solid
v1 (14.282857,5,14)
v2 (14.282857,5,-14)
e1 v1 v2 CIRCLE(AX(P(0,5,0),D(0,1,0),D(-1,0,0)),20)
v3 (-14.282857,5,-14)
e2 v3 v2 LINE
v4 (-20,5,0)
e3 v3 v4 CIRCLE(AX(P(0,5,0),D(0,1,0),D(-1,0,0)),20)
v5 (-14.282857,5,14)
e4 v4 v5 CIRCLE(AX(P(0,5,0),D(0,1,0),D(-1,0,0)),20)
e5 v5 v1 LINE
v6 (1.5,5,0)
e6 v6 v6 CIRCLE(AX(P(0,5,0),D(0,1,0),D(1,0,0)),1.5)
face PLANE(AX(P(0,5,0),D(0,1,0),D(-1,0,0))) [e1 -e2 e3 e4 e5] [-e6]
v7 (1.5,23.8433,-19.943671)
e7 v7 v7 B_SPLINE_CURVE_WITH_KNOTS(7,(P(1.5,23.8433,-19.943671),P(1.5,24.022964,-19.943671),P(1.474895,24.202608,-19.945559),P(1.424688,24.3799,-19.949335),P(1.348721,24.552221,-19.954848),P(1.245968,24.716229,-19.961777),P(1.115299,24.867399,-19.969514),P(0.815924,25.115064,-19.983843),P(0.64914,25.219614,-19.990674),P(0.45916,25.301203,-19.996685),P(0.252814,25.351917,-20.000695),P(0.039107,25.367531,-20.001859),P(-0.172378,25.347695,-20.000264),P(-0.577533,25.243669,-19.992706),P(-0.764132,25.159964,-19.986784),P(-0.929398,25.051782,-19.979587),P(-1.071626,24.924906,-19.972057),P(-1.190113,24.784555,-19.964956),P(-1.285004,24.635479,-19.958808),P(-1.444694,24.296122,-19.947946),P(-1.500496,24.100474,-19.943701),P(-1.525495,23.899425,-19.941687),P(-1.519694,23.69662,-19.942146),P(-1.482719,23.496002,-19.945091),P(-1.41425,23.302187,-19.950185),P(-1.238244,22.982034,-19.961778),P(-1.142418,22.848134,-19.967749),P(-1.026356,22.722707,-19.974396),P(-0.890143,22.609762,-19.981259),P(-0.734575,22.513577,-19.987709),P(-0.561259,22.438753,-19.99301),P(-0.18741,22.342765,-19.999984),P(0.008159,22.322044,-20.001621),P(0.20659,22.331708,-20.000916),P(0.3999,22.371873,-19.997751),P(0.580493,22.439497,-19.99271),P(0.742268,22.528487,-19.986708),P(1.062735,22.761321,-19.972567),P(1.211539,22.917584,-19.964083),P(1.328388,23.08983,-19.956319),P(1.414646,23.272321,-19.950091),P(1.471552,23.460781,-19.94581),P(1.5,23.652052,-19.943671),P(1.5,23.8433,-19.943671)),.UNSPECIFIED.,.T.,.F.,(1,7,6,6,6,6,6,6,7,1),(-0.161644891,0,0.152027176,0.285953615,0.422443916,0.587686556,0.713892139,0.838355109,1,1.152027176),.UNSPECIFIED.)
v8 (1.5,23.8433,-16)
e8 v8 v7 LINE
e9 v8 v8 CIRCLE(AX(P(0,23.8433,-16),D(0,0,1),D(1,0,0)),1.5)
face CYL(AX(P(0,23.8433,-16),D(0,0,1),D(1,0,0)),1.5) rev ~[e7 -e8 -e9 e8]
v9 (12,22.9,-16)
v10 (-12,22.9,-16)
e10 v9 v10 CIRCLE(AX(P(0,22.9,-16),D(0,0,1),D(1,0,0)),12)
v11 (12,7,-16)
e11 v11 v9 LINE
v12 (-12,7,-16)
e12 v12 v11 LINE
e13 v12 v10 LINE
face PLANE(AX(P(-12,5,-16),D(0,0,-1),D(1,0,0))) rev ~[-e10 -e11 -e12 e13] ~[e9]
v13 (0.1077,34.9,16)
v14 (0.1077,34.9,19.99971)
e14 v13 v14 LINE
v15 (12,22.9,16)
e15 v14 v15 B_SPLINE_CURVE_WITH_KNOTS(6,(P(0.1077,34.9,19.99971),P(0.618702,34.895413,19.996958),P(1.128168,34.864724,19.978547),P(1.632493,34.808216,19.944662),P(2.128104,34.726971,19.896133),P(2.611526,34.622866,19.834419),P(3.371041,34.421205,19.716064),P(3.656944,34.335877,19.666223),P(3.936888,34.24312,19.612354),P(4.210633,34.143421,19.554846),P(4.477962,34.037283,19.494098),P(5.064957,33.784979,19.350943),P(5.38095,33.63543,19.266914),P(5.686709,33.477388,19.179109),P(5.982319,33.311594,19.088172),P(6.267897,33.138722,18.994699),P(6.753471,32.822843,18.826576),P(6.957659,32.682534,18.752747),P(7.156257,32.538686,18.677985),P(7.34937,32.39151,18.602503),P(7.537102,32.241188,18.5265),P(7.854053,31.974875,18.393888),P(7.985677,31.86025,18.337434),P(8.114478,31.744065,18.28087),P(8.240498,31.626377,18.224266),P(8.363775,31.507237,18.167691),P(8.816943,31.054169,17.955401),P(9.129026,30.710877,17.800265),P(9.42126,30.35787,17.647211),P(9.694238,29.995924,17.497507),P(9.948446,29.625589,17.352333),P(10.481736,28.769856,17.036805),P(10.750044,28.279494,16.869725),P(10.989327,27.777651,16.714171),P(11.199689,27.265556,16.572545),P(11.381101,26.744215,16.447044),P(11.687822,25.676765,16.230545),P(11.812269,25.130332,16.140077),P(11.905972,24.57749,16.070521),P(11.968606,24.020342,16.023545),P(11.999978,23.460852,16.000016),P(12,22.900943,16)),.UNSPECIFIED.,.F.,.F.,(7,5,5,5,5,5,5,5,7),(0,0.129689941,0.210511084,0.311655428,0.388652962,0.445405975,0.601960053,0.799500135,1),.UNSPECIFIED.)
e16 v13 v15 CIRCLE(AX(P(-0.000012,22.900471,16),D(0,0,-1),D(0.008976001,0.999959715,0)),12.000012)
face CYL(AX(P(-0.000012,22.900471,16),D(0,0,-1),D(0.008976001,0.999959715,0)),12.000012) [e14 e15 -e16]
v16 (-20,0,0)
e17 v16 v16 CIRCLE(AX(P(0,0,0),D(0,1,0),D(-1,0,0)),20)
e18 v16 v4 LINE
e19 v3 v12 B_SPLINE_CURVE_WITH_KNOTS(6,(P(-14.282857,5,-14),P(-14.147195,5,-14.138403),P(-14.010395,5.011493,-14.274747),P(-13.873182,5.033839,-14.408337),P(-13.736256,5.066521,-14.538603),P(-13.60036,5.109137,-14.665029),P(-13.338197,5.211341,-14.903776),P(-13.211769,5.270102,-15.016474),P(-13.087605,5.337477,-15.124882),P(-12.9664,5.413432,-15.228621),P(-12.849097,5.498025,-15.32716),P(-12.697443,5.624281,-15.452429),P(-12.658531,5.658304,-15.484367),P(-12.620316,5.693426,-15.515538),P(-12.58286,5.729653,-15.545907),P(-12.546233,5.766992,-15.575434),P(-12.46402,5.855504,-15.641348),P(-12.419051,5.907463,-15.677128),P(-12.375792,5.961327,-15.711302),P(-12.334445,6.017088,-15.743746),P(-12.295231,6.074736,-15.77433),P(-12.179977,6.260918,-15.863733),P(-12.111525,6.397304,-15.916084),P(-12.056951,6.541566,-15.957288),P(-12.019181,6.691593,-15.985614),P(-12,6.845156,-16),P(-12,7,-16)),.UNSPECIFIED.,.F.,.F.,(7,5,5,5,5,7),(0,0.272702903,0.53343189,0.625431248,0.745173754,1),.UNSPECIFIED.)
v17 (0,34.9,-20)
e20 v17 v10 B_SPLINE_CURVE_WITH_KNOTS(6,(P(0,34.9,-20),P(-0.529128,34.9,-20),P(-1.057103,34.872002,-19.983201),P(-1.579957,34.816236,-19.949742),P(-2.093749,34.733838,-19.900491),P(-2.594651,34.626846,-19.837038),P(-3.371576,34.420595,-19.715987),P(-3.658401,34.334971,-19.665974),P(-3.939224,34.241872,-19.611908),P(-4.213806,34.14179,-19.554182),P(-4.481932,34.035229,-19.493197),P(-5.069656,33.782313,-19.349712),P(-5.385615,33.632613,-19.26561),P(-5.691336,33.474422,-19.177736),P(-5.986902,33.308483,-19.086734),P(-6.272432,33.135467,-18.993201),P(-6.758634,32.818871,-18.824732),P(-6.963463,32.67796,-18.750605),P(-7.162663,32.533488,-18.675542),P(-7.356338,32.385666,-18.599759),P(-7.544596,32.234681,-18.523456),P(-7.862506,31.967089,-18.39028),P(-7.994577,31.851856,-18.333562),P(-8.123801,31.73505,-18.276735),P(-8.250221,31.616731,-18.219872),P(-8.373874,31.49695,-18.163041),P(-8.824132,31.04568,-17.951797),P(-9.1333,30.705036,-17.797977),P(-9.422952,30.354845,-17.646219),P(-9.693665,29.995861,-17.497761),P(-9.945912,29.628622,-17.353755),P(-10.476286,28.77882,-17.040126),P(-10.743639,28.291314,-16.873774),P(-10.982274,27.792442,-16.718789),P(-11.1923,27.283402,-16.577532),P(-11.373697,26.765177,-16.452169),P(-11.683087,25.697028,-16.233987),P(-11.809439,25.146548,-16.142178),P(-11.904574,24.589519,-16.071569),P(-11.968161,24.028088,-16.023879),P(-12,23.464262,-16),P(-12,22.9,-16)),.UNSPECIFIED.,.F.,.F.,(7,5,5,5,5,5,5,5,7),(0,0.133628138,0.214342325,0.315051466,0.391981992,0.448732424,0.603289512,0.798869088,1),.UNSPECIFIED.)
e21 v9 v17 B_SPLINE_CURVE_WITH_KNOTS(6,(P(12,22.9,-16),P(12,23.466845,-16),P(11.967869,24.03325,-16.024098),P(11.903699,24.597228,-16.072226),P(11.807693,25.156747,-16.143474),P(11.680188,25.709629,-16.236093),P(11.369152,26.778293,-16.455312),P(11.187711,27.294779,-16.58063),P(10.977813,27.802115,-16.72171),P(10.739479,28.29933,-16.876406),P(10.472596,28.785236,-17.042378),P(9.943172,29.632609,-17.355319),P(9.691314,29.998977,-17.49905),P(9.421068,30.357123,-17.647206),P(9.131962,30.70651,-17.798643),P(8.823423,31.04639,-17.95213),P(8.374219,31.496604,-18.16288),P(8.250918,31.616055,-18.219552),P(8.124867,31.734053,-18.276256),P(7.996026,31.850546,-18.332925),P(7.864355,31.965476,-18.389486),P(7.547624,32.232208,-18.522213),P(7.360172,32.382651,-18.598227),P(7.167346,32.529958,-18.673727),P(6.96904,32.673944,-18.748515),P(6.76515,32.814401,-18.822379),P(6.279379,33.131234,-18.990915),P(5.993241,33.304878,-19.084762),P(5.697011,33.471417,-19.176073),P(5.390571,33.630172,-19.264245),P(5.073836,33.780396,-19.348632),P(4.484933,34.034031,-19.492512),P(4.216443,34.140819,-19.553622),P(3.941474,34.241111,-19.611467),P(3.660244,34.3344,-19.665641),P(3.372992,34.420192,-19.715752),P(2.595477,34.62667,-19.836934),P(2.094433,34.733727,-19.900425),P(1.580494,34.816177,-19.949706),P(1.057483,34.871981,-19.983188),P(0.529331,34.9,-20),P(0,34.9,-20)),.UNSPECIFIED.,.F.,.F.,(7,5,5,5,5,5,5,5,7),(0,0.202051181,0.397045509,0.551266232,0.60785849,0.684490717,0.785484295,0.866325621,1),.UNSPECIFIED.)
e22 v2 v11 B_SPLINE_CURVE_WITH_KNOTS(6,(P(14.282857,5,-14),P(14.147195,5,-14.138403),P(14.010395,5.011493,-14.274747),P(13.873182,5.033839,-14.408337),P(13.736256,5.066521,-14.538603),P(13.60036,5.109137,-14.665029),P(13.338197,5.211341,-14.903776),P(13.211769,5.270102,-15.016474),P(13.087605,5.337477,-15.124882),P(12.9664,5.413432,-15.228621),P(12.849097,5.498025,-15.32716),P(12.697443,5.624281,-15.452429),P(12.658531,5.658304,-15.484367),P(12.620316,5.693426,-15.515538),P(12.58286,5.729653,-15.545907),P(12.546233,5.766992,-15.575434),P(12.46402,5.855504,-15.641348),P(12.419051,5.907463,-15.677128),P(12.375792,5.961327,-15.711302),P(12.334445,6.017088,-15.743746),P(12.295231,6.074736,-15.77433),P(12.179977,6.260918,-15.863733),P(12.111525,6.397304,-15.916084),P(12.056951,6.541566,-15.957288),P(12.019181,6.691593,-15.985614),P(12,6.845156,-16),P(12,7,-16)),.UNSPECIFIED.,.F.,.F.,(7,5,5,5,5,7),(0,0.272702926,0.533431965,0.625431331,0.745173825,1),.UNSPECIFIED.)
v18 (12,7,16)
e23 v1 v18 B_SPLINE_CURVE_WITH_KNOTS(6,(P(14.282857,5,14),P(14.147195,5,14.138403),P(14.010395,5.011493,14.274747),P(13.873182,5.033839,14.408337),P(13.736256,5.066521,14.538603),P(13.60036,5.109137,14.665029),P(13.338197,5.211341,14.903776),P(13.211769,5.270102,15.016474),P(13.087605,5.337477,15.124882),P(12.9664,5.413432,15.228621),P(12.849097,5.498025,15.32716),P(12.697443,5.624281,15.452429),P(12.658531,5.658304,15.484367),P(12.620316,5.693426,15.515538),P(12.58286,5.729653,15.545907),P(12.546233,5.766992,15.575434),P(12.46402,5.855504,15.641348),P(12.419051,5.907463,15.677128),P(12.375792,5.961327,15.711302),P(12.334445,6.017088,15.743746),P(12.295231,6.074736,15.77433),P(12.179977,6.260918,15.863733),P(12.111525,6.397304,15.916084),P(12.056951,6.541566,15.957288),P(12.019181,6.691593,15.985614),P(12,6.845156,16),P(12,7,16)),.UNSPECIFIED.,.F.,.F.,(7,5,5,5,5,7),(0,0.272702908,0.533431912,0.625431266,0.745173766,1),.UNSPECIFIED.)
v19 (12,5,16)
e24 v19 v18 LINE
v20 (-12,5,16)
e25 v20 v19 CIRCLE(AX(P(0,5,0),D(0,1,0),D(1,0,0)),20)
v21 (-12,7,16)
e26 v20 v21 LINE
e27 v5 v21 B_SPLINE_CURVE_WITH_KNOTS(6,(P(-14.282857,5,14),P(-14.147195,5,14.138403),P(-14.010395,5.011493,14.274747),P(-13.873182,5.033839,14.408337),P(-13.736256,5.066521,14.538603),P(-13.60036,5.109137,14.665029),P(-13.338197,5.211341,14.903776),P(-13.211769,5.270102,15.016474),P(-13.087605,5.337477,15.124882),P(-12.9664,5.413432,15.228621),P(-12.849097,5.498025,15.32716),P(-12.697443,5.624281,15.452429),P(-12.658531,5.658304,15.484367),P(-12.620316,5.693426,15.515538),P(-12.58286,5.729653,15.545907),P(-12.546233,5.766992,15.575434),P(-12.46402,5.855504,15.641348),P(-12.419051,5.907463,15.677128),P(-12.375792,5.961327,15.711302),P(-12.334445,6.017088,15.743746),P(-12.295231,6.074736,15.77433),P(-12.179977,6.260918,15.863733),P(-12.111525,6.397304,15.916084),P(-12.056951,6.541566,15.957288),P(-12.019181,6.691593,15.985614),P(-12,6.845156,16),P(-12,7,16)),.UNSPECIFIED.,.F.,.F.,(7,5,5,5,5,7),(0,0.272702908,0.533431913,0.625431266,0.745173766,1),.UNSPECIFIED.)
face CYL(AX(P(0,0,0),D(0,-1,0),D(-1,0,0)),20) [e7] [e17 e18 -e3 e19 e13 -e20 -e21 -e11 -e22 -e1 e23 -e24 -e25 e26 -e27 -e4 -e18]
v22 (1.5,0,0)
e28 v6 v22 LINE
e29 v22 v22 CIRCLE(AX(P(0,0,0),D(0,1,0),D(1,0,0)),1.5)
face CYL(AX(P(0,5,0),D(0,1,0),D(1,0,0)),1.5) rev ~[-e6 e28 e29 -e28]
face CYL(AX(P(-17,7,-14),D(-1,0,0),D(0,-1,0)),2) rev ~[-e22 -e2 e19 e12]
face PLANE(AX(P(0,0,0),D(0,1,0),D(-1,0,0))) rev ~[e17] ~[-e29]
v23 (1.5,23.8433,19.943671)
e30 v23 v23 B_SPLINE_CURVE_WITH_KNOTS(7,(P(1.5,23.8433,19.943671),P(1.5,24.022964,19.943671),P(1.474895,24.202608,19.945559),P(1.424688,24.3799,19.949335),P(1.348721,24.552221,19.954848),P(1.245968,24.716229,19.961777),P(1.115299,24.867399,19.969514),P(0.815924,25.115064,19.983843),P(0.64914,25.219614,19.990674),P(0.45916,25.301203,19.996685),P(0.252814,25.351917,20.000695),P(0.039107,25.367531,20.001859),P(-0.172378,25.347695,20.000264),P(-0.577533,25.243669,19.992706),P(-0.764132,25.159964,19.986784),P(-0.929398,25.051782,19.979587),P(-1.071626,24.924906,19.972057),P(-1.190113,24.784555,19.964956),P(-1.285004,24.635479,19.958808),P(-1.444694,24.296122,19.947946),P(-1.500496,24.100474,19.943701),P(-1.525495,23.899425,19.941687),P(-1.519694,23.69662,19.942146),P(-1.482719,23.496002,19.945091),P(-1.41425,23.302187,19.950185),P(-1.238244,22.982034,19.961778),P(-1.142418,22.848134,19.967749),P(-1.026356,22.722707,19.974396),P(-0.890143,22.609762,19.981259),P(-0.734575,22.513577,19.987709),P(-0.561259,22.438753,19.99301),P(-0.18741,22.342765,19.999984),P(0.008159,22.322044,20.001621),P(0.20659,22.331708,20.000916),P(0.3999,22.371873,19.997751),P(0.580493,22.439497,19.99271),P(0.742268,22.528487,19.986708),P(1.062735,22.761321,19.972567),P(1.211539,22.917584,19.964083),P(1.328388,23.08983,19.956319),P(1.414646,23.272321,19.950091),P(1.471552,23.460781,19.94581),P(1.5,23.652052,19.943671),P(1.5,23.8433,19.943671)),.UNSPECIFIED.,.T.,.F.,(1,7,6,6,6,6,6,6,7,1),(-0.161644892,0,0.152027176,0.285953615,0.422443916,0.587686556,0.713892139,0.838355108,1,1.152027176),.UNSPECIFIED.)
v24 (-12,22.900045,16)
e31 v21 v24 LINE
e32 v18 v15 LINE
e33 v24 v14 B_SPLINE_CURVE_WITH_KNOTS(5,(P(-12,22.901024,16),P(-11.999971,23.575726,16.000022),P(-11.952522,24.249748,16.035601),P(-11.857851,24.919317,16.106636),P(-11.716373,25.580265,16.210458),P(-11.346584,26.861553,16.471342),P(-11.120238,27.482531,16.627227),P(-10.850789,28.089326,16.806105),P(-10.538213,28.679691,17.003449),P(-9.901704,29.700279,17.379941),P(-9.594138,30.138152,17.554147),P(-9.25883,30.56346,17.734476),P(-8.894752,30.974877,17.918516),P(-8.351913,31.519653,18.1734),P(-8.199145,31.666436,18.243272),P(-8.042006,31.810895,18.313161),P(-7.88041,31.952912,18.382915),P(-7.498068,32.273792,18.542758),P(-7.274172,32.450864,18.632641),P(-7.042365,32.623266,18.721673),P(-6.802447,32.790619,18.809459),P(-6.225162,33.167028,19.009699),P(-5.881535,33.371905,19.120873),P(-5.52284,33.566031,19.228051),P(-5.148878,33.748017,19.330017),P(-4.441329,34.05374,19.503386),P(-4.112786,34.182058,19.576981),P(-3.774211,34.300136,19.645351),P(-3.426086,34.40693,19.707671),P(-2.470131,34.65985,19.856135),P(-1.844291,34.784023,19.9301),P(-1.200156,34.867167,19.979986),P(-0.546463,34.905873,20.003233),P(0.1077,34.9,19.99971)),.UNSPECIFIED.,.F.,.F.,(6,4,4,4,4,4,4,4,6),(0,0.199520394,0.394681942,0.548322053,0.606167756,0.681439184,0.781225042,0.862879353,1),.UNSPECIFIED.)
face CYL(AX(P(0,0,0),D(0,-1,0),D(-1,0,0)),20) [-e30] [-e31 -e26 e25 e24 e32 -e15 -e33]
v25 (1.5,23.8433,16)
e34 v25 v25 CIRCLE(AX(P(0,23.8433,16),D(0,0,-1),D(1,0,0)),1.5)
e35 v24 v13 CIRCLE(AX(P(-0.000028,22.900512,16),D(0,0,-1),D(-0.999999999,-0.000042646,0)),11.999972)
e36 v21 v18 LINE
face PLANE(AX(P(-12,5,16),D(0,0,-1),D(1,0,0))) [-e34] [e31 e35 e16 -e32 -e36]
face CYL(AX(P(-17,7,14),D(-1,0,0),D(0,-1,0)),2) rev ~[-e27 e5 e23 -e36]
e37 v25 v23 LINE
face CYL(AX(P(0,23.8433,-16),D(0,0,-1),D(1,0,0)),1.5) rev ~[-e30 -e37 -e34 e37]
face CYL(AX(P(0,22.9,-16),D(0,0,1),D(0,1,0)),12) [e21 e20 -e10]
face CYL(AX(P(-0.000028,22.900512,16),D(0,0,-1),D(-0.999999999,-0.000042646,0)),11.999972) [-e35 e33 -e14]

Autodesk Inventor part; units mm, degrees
ref_plane "YZ Plane" through (0, 0, 0) normal (1, 0, 0) x (0, 1, 0)
ref_plane "XZ Plane" through (0, 0, 0) normal (0, 1, 0) x (-1, 0, 0)
ref_plane "XY Plane" through (0, 0, 0) normal (0, 0, 1) x (1, 0, 0)
sketch "Sketch1" plane through (0, 0, 0) normal (0, 1, 0) x (-1, 0, 0)
  circle A0 centre (0, 0) radius 20
  dimension "d0" = 40
extrude "Extrusion1" add sketch "Sketch1" along normal blind 5
sketch "Sketch2" plane through (0, 5, 0) normal (0, 1, 0) x (1, 0, 0)
  circle A0 centre (0, 0) radius 20 projected
  line L0 (-12, 16) -> (12, 16)
  line L1 (-12, -16) -> (12, -16)
  dimension "d3" = 4
  dimension "d4" = 4
extrude "Extrusion2" add sketch "Sketch2" along normal blind 30 contours L0 A0 | A0 L1
sketch "Sketch4" plane through (12, 5, 16) normal (0, 0, -1) x (-1, 0, 0)
  line L0 (24, 30) -> (24, 17.9)
  line L1 (0, 30) -> (0, 17.9)
  arc A0 (11.8923, 29.9) -> (0, 17.9) centre (12, 17.9005) ccw
  arc A1 (24, 17.9) -> (11.8923, 29.9) centre (12, 17.9005) ccw
  line L2 (0, 30) -> (24, 30)
  point P0 (12, -5)
  dimension "d10" = 12.1
  dimension "d11" = 12.1
  dimension "d12" = 12
  dimension "d13" = 12
extrude "Extrusion3" cut sketch "Sketch4" against normal blind 25
sketch "Sketch5" plane through (-12, 5, -16) normal (0, 0, 1) x (1, 0, 0)
  line L0 (24, 30) -> (24, 17.9)
  line L1 (0, 30) -> (0, 17.9)
  arc A0 (12, 29.9) -> (0, 17.9) centre (12, 17.9) ccw
  arc A1 (24, 17.9) -> (12, 29.9) centre (12, 17.9) ccw
  line L2 (24, 30) -> (0, 30) projected
  line L3 (0, 30) -> (24, 30)
  point P0 (12, -5)
  dimension "d16" = 12.1
  dimension "d17" = 12.1
  dimension "d18" = 12
  dimension "d19" = 12
extrude "Extrusion4" cut sketch "Sketch5" against normal blind 25
sketch "Sketch6" plane through (-12, 5, -16) normal (0, 0, 1) x (1, 0, 0)
  circle A0 centre (12, 18.8433) radius 1.5
  line L0 (0, 0) -> (0, 18.8433)
  line L1 (0, 18.8433) -> (23.891, 18.8433)
  point P0 (12, -5)
  dimension "d22" = 3
  dimension "d23" = 12
  dimension "d24" = 0
extrude "Extrusion5" cut sketch "Sketch6" along normal mid plane 500
fillet "Fillet1" radius 2 2 edges at (0, 5, 16) (0, 5, -16)
sketch "Sketch7" plane through (0, 5, 0) normal (0, 1, 0) x (1, 0, 0)
  circle A0 centre (0, 0) radius 1.5
  dimension "d28" = 3
extrude "Extrusion6" cut sketch "Sketch7" against normal blind 10
properties part number "hlava"
